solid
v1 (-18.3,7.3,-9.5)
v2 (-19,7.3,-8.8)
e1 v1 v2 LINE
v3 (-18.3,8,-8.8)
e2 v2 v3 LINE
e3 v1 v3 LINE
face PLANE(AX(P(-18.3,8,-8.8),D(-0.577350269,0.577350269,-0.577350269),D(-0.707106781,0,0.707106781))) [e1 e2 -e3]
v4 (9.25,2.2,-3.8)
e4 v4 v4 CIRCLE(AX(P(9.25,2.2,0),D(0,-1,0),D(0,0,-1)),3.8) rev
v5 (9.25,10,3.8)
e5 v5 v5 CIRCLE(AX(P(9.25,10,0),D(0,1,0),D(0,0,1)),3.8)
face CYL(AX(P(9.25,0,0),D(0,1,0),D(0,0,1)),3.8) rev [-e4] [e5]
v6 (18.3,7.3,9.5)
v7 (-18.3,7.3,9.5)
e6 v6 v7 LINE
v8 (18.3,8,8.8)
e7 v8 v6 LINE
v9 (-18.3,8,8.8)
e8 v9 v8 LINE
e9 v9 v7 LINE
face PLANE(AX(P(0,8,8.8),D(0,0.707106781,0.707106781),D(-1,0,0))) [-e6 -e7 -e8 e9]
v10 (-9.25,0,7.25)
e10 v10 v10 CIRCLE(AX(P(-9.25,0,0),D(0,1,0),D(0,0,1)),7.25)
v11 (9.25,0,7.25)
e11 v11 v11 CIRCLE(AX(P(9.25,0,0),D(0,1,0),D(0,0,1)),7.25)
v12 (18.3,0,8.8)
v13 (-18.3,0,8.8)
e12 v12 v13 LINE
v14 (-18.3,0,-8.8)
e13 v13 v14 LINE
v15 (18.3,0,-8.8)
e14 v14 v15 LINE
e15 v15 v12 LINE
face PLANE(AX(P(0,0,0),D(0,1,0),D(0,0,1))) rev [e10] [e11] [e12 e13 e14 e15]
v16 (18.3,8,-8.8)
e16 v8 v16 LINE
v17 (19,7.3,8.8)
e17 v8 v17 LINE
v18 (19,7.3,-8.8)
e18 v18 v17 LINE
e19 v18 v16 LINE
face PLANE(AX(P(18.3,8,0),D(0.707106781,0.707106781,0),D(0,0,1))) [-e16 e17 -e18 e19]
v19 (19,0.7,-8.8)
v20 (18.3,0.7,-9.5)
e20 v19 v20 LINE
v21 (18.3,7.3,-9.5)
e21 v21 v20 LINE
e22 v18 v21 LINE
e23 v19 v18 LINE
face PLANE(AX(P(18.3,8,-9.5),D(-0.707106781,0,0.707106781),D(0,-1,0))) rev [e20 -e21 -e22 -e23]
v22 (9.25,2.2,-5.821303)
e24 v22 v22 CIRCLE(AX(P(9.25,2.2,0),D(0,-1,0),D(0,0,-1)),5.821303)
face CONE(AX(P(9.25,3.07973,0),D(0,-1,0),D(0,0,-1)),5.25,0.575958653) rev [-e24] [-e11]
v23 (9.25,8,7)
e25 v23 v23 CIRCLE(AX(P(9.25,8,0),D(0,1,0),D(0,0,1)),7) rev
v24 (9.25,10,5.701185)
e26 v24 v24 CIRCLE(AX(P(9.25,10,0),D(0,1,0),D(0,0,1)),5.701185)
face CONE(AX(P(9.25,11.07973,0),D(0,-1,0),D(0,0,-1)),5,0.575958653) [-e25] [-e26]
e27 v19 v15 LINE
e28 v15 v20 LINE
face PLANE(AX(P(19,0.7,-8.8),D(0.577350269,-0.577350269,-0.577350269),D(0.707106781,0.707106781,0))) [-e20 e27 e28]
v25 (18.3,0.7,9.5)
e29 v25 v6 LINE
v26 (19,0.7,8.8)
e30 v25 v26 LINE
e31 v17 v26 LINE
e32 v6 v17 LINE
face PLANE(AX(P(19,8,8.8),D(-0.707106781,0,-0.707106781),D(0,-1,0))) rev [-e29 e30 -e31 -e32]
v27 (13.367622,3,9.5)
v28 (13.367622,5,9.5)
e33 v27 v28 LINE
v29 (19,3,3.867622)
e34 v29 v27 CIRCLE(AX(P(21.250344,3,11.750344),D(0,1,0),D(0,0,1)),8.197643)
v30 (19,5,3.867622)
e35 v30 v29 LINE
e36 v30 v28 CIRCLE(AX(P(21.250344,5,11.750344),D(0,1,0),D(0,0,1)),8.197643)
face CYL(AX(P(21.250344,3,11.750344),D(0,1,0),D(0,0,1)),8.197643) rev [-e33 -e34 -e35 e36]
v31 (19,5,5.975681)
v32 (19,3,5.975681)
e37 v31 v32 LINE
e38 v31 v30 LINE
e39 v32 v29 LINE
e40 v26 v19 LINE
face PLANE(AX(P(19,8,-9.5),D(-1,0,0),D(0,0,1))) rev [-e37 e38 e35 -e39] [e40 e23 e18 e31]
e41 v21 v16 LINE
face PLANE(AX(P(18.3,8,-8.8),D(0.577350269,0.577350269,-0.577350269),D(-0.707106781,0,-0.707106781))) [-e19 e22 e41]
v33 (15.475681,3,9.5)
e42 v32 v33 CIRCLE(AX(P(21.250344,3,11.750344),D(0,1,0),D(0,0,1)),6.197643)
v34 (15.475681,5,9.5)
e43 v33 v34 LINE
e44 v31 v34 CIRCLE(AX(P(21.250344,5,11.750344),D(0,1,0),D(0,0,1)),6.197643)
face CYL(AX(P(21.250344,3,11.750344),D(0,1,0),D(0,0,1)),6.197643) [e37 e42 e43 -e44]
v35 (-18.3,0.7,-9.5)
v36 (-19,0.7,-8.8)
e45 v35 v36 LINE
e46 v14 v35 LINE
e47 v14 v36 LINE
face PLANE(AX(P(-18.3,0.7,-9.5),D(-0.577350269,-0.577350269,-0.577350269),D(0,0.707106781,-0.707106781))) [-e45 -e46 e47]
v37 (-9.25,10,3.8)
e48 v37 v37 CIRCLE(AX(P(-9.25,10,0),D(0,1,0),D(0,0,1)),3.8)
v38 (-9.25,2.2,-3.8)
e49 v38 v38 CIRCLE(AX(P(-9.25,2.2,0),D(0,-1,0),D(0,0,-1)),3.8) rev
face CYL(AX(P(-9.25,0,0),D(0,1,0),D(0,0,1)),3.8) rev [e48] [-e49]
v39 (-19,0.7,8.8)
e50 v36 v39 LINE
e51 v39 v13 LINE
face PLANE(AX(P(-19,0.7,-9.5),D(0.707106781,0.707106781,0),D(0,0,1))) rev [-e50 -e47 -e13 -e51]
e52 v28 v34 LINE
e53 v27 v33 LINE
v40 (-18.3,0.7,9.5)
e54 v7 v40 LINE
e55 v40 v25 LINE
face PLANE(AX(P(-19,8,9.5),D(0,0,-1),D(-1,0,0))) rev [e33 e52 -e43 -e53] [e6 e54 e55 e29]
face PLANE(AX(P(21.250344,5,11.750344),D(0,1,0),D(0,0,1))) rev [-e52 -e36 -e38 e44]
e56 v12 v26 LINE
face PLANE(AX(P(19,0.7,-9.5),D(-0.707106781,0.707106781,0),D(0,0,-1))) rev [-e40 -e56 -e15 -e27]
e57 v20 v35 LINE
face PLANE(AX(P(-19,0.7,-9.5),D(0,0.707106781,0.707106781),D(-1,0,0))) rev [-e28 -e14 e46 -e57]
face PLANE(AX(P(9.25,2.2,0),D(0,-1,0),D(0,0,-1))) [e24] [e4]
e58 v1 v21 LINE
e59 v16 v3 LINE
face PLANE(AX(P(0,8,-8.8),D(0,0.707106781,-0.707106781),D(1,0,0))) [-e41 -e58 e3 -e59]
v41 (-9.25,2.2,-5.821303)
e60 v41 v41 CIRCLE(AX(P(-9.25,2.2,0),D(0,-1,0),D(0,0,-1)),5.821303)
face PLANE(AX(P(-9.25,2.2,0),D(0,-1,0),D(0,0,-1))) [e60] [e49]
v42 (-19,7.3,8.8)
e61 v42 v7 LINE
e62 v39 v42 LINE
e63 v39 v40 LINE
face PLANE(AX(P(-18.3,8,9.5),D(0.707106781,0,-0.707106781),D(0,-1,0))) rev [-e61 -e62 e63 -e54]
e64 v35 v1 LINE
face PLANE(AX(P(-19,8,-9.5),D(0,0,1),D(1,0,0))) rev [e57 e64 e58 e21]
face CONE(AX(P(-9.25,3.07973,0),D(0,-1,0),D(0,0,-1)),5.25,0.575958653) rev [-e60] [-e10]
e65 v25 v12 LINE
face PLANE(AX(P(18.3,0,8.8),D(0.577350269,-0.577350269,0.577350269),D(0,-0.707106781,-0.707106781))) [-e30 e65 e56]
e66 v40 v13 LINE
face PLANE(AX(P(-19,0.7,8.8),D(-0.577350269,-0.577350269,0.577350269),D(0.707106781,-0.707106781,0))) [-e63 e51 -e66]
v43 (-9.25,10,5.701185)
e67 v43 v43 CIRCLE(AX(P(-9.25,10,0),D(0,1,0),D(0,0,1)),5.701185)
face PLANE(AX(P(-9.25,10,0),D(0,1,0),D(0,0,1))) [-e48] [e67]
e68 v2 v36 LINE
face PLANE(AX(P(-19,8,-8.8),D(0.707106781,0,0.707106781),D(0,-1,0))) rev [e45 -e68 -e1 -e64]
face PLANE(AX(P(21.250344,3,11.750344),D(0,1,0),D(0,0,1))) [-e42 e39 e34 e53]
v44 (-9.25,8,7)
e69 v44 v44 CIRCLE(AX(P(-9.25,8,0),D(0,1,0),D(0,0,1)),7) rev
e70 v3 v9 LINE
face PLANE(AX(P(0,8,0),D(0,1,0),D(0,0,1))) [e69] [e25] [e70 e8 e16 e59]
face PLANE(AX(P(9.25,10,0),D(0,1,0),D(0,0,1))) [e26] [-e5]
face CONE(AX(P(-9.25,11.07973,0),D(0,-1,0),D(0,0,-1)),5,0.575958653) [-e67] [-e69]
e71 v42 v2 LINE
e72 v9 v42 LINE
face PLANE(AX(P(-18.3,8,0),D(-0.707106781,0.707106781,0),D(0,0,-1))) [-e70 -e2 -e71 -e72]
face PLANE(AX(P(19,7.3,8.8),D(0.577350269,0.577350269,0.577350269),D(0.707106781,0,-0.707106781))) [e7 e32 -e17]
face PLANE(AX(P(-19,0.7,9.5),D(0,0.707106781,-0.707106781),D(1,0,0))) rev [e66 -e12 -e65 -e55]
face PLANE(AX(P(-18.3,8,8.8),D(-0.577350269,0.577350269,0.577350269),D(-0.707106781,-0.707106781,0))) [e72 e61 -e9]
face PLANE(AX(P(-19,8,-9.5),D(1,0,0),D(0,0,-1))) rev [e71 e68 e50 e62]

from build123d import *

# Parameters (mm, degrees)
CROQUIS1_W              = 38
CROQUIS1_H              = 19
SALIENTE_EXTRUIR1_DEPTH = 8
CROQUIS2_R              = 5
SALIENTE_EXTRUIR2_DEPTH = 2
CROQUIS3_R              = 3.8
CORTAR_EXTRUIR1_DEPTH   = 24.478713764
CHAFL_N2_SIZE           = 0.7
CROQUIS4_R              = 5.25
CORTAR_EXTRUIR2_DEPTH   = 2.2
CHAFL_N1_SIZE           = 2
CHAFL_N1_SIZE_2         = 3.079729928
CORTAR_EXTRUIR3_START   = -3
CROQUIS6_R              = 8.19764283
CROQUIS6_R_2            = 6.19764283
CORTAR_EXTRUIR3_DEPTH   = 2


with BuildPart() as part:
    # Croquis1 → Saliente-Extruir1 (new body)
    with BuildSketch(Plane(origin=(0, 0, 0), x_dir=(1, 0, 0), z_dir=(0, 1, 0))):
        Rectangle(CROQUIS1_W, CROQUIS1_H)
    extrude(amount=SALIENTE_EXTRUIR1_DEPTH)

    # Croquis2 → Saliente-Extruir2 (add)
    with BuildSketch(Plane(origin=(0, 8, 0), x_dir=(1, 0, 0), z_dir=(0, 1, 0))):
        with Locations(Location((-9.25, 0, 0), (0, 0, 270))):
            Circle(CROQUIS2_R)
        with Locations(Location((9.25, 0, 0), (0, 0, 270))):
            Circle(CROQUIS2_R)
    extrude(amount=SALIENTE_EXTRUIR2_DEPTH)

    # Croquis3 → Cortar-Extruir1 (cut, through all)
    with BuildSketch(Plane(origin=(0, 10, 0), x_dir=(1, 0, 0), z_dir=(0, 1, 0))):
        with Locations(Location((9.25, 0, 0), (0, 0, 270))):
            Circle(CROQUIS3_R)
        with Locations(Location((-9.25, 0, 0), (0, 0, 270))):
            Circle(CROQUIS3_R)
    extrude(amount=-CORTAR_EXTRUIR1_DEPTH, mode=Mode.SUBTRACT)

    # Chaflán2
    chafl_n2_edges = [part.edges().sort_by_distance(p)[0] for p in [
        (-19, 8, 0),
        (0, 8, 9.5),
        (19, 8, 0),
        (0, 0, 9.5),
        (-19, 0, 0),
        (0, 0, -9.5),
        (19, 0, 0),
        (0, 8, -9.5),
        (19, 4, 9.5),
        (-19, 4, 9.5),
        (-19, 4, -9.5),
        (19, 4, -9.5),
    ]]
    chamfer(chafl_n2_edges, length=CHAFL_N2_SIZE)

    # Croquis4 → Cortar-Extruir2 (cut)
    with BuildSketch(Plane.XZ):
        with Locations(Location((9.25, 0, 0), (0, 0, 270))):
            Circle(CROQUIS4_R)
        with Locations(Location((-9.25, 0, 0), (0, 0, 270))):
            Circle(CROQUIS4_R)
    extrude(amount=-CORTAR_EXTRUIR2_DEPTH, mode=Mode.SUBTRACT)

    # Chaflán1
    # the kernel refuses this chamfer: 3.079729928, 2 mm, written as the material it adds along each edge
    with BuildSketch(Plane(origin=(9.25, 8, 0), x_dir=(0, 0, 1), z_dir=(-1, 0, 0))) as chafl_n1_piece_1_section:
        Polygon((5 + CHAFL_N1_SIZE, 0), (5, CHAFL_N1_SIZE_2), (5, 0), align=None)
    chafl_n1_piece_1 = revolve(axis=Axis((9.25, 8, 0), (0, 1, 0)), mode=Mode.PRIVATE)
    chafl_n1_piece_1 = split(chafl_n1_piece_1, bisect_by=Plane(origin=(9.25, 10, -6.344305077), z_dir=(0, -1, 0)), keep=Keep.TOP, mode=Mode.PRIVATE)
    add(chafl_n1_piece_1)
    with BuildSketch(Plane(origin=(-9.25, 8, 0), x_dir=(0, 0, 1), z_dir=(-1, 0, 0))) as chafl_n1_piece_2_section:
        Polygon((5 + CHAFL_N1_SIZE, 0), (5, CHAFL_N1_SIZE_2), (5, 0), align=None)
    chafl_n1_piece_2 = revolve(axis=Axis((-9.25, 8, 0), (0, 1, 0)), mode=Mode.PRIVATE)
    chafl_n1_piece_2 = split(chafl_n1_piece_2, bisect_by=Plane(origin=(-9.25, 10, -6.344305078), z_dir=(0, -1, 0)), keep=Keep.TOP, mode=Mode.PRIVATE)
    add(chafl_n1_piece_2)
    # the kernel refuses this chamfer: 3.079729928, 2 mm, written as the material it takes off along each edge
    with BuildSketch(Plane(origin=(-9.25, 0, 0), x_dir=(0, 0, -1), z_dir=(-1, 0, 0))) as chafl_n1_2_piece_1_section:
        Polygon((5.25 + CHAFL_N1_SIZE, 0), (5.25, -CHAFL_N1_SIZE_2), (5.25, 0), align=None)
    chafl_n1_2_piece_1 = revolve(axis=Axis((-9.25, 0, 0), (0, -1, 0)), mode=Mode.PRIVATE)
    chafl_n1_2_piece_1 = split(chafl_n1_2_piece_1, bisect_by=Plane(origin=(-9.25, 2.2, 6.528205243), z_dir=(0, -1, 0)), keep=Keep.TOP, mode=Mode.PRIVATE)
    add(chafl_n1_2_piece_1, mode=Mode.SUBTRACT)
    with BuildSketch(Plane(origin=(9.25, 0, 0), x_dir=(0, 0, -1), z_dir=(-1, 0, 0))) as chafl_n1_2_piece_2_section:
        Polygon((5.25 + CHAFL_N1_SIZE, 0), (5.25, -CHAFL_N1_SIZE_2), (5.25, 0), align=None)
    chafl_n1_2_piece_2 = revolve(axis=Axis((9.25, 0, 0), (0, -1, 0)), mode=Mode.PRIVATE)
    chafl_n1_2_piece_2 = split(chafl_n1_2_piece_2, bisect_by=Plane(origin=(9.25, 2.2, 6.528205242), z_dir=(0, -1, 0)), keep=Keep.TOP, mode=Mode.PRIVATE)
    add(chafl_n1_2_piece_2, mode=Mode.SUBTRACT)

    # Croquis6 → Cortar-Extruir3 (cut)
    with BuildSketch(Plane(origin=(0, 8, 0), x_dir=(1, 0, 0), z_dir=(0, 1, 0)).offset(CORTAR_EXTRUIR3_START)):
        with Locations((21.250343834, -11.750343834)):
            Circle(CROQUIS6_R)
        with Locations((21.250343834, -11.750343834)):
            Circle(CROQUIS6_R_2, mode=Mode.SUBTRACT)
    extrude(amount=-CORTAR_EXTRUIR3_DEPTH, mode=Mode.SUBTRACT)


solid = part.part
